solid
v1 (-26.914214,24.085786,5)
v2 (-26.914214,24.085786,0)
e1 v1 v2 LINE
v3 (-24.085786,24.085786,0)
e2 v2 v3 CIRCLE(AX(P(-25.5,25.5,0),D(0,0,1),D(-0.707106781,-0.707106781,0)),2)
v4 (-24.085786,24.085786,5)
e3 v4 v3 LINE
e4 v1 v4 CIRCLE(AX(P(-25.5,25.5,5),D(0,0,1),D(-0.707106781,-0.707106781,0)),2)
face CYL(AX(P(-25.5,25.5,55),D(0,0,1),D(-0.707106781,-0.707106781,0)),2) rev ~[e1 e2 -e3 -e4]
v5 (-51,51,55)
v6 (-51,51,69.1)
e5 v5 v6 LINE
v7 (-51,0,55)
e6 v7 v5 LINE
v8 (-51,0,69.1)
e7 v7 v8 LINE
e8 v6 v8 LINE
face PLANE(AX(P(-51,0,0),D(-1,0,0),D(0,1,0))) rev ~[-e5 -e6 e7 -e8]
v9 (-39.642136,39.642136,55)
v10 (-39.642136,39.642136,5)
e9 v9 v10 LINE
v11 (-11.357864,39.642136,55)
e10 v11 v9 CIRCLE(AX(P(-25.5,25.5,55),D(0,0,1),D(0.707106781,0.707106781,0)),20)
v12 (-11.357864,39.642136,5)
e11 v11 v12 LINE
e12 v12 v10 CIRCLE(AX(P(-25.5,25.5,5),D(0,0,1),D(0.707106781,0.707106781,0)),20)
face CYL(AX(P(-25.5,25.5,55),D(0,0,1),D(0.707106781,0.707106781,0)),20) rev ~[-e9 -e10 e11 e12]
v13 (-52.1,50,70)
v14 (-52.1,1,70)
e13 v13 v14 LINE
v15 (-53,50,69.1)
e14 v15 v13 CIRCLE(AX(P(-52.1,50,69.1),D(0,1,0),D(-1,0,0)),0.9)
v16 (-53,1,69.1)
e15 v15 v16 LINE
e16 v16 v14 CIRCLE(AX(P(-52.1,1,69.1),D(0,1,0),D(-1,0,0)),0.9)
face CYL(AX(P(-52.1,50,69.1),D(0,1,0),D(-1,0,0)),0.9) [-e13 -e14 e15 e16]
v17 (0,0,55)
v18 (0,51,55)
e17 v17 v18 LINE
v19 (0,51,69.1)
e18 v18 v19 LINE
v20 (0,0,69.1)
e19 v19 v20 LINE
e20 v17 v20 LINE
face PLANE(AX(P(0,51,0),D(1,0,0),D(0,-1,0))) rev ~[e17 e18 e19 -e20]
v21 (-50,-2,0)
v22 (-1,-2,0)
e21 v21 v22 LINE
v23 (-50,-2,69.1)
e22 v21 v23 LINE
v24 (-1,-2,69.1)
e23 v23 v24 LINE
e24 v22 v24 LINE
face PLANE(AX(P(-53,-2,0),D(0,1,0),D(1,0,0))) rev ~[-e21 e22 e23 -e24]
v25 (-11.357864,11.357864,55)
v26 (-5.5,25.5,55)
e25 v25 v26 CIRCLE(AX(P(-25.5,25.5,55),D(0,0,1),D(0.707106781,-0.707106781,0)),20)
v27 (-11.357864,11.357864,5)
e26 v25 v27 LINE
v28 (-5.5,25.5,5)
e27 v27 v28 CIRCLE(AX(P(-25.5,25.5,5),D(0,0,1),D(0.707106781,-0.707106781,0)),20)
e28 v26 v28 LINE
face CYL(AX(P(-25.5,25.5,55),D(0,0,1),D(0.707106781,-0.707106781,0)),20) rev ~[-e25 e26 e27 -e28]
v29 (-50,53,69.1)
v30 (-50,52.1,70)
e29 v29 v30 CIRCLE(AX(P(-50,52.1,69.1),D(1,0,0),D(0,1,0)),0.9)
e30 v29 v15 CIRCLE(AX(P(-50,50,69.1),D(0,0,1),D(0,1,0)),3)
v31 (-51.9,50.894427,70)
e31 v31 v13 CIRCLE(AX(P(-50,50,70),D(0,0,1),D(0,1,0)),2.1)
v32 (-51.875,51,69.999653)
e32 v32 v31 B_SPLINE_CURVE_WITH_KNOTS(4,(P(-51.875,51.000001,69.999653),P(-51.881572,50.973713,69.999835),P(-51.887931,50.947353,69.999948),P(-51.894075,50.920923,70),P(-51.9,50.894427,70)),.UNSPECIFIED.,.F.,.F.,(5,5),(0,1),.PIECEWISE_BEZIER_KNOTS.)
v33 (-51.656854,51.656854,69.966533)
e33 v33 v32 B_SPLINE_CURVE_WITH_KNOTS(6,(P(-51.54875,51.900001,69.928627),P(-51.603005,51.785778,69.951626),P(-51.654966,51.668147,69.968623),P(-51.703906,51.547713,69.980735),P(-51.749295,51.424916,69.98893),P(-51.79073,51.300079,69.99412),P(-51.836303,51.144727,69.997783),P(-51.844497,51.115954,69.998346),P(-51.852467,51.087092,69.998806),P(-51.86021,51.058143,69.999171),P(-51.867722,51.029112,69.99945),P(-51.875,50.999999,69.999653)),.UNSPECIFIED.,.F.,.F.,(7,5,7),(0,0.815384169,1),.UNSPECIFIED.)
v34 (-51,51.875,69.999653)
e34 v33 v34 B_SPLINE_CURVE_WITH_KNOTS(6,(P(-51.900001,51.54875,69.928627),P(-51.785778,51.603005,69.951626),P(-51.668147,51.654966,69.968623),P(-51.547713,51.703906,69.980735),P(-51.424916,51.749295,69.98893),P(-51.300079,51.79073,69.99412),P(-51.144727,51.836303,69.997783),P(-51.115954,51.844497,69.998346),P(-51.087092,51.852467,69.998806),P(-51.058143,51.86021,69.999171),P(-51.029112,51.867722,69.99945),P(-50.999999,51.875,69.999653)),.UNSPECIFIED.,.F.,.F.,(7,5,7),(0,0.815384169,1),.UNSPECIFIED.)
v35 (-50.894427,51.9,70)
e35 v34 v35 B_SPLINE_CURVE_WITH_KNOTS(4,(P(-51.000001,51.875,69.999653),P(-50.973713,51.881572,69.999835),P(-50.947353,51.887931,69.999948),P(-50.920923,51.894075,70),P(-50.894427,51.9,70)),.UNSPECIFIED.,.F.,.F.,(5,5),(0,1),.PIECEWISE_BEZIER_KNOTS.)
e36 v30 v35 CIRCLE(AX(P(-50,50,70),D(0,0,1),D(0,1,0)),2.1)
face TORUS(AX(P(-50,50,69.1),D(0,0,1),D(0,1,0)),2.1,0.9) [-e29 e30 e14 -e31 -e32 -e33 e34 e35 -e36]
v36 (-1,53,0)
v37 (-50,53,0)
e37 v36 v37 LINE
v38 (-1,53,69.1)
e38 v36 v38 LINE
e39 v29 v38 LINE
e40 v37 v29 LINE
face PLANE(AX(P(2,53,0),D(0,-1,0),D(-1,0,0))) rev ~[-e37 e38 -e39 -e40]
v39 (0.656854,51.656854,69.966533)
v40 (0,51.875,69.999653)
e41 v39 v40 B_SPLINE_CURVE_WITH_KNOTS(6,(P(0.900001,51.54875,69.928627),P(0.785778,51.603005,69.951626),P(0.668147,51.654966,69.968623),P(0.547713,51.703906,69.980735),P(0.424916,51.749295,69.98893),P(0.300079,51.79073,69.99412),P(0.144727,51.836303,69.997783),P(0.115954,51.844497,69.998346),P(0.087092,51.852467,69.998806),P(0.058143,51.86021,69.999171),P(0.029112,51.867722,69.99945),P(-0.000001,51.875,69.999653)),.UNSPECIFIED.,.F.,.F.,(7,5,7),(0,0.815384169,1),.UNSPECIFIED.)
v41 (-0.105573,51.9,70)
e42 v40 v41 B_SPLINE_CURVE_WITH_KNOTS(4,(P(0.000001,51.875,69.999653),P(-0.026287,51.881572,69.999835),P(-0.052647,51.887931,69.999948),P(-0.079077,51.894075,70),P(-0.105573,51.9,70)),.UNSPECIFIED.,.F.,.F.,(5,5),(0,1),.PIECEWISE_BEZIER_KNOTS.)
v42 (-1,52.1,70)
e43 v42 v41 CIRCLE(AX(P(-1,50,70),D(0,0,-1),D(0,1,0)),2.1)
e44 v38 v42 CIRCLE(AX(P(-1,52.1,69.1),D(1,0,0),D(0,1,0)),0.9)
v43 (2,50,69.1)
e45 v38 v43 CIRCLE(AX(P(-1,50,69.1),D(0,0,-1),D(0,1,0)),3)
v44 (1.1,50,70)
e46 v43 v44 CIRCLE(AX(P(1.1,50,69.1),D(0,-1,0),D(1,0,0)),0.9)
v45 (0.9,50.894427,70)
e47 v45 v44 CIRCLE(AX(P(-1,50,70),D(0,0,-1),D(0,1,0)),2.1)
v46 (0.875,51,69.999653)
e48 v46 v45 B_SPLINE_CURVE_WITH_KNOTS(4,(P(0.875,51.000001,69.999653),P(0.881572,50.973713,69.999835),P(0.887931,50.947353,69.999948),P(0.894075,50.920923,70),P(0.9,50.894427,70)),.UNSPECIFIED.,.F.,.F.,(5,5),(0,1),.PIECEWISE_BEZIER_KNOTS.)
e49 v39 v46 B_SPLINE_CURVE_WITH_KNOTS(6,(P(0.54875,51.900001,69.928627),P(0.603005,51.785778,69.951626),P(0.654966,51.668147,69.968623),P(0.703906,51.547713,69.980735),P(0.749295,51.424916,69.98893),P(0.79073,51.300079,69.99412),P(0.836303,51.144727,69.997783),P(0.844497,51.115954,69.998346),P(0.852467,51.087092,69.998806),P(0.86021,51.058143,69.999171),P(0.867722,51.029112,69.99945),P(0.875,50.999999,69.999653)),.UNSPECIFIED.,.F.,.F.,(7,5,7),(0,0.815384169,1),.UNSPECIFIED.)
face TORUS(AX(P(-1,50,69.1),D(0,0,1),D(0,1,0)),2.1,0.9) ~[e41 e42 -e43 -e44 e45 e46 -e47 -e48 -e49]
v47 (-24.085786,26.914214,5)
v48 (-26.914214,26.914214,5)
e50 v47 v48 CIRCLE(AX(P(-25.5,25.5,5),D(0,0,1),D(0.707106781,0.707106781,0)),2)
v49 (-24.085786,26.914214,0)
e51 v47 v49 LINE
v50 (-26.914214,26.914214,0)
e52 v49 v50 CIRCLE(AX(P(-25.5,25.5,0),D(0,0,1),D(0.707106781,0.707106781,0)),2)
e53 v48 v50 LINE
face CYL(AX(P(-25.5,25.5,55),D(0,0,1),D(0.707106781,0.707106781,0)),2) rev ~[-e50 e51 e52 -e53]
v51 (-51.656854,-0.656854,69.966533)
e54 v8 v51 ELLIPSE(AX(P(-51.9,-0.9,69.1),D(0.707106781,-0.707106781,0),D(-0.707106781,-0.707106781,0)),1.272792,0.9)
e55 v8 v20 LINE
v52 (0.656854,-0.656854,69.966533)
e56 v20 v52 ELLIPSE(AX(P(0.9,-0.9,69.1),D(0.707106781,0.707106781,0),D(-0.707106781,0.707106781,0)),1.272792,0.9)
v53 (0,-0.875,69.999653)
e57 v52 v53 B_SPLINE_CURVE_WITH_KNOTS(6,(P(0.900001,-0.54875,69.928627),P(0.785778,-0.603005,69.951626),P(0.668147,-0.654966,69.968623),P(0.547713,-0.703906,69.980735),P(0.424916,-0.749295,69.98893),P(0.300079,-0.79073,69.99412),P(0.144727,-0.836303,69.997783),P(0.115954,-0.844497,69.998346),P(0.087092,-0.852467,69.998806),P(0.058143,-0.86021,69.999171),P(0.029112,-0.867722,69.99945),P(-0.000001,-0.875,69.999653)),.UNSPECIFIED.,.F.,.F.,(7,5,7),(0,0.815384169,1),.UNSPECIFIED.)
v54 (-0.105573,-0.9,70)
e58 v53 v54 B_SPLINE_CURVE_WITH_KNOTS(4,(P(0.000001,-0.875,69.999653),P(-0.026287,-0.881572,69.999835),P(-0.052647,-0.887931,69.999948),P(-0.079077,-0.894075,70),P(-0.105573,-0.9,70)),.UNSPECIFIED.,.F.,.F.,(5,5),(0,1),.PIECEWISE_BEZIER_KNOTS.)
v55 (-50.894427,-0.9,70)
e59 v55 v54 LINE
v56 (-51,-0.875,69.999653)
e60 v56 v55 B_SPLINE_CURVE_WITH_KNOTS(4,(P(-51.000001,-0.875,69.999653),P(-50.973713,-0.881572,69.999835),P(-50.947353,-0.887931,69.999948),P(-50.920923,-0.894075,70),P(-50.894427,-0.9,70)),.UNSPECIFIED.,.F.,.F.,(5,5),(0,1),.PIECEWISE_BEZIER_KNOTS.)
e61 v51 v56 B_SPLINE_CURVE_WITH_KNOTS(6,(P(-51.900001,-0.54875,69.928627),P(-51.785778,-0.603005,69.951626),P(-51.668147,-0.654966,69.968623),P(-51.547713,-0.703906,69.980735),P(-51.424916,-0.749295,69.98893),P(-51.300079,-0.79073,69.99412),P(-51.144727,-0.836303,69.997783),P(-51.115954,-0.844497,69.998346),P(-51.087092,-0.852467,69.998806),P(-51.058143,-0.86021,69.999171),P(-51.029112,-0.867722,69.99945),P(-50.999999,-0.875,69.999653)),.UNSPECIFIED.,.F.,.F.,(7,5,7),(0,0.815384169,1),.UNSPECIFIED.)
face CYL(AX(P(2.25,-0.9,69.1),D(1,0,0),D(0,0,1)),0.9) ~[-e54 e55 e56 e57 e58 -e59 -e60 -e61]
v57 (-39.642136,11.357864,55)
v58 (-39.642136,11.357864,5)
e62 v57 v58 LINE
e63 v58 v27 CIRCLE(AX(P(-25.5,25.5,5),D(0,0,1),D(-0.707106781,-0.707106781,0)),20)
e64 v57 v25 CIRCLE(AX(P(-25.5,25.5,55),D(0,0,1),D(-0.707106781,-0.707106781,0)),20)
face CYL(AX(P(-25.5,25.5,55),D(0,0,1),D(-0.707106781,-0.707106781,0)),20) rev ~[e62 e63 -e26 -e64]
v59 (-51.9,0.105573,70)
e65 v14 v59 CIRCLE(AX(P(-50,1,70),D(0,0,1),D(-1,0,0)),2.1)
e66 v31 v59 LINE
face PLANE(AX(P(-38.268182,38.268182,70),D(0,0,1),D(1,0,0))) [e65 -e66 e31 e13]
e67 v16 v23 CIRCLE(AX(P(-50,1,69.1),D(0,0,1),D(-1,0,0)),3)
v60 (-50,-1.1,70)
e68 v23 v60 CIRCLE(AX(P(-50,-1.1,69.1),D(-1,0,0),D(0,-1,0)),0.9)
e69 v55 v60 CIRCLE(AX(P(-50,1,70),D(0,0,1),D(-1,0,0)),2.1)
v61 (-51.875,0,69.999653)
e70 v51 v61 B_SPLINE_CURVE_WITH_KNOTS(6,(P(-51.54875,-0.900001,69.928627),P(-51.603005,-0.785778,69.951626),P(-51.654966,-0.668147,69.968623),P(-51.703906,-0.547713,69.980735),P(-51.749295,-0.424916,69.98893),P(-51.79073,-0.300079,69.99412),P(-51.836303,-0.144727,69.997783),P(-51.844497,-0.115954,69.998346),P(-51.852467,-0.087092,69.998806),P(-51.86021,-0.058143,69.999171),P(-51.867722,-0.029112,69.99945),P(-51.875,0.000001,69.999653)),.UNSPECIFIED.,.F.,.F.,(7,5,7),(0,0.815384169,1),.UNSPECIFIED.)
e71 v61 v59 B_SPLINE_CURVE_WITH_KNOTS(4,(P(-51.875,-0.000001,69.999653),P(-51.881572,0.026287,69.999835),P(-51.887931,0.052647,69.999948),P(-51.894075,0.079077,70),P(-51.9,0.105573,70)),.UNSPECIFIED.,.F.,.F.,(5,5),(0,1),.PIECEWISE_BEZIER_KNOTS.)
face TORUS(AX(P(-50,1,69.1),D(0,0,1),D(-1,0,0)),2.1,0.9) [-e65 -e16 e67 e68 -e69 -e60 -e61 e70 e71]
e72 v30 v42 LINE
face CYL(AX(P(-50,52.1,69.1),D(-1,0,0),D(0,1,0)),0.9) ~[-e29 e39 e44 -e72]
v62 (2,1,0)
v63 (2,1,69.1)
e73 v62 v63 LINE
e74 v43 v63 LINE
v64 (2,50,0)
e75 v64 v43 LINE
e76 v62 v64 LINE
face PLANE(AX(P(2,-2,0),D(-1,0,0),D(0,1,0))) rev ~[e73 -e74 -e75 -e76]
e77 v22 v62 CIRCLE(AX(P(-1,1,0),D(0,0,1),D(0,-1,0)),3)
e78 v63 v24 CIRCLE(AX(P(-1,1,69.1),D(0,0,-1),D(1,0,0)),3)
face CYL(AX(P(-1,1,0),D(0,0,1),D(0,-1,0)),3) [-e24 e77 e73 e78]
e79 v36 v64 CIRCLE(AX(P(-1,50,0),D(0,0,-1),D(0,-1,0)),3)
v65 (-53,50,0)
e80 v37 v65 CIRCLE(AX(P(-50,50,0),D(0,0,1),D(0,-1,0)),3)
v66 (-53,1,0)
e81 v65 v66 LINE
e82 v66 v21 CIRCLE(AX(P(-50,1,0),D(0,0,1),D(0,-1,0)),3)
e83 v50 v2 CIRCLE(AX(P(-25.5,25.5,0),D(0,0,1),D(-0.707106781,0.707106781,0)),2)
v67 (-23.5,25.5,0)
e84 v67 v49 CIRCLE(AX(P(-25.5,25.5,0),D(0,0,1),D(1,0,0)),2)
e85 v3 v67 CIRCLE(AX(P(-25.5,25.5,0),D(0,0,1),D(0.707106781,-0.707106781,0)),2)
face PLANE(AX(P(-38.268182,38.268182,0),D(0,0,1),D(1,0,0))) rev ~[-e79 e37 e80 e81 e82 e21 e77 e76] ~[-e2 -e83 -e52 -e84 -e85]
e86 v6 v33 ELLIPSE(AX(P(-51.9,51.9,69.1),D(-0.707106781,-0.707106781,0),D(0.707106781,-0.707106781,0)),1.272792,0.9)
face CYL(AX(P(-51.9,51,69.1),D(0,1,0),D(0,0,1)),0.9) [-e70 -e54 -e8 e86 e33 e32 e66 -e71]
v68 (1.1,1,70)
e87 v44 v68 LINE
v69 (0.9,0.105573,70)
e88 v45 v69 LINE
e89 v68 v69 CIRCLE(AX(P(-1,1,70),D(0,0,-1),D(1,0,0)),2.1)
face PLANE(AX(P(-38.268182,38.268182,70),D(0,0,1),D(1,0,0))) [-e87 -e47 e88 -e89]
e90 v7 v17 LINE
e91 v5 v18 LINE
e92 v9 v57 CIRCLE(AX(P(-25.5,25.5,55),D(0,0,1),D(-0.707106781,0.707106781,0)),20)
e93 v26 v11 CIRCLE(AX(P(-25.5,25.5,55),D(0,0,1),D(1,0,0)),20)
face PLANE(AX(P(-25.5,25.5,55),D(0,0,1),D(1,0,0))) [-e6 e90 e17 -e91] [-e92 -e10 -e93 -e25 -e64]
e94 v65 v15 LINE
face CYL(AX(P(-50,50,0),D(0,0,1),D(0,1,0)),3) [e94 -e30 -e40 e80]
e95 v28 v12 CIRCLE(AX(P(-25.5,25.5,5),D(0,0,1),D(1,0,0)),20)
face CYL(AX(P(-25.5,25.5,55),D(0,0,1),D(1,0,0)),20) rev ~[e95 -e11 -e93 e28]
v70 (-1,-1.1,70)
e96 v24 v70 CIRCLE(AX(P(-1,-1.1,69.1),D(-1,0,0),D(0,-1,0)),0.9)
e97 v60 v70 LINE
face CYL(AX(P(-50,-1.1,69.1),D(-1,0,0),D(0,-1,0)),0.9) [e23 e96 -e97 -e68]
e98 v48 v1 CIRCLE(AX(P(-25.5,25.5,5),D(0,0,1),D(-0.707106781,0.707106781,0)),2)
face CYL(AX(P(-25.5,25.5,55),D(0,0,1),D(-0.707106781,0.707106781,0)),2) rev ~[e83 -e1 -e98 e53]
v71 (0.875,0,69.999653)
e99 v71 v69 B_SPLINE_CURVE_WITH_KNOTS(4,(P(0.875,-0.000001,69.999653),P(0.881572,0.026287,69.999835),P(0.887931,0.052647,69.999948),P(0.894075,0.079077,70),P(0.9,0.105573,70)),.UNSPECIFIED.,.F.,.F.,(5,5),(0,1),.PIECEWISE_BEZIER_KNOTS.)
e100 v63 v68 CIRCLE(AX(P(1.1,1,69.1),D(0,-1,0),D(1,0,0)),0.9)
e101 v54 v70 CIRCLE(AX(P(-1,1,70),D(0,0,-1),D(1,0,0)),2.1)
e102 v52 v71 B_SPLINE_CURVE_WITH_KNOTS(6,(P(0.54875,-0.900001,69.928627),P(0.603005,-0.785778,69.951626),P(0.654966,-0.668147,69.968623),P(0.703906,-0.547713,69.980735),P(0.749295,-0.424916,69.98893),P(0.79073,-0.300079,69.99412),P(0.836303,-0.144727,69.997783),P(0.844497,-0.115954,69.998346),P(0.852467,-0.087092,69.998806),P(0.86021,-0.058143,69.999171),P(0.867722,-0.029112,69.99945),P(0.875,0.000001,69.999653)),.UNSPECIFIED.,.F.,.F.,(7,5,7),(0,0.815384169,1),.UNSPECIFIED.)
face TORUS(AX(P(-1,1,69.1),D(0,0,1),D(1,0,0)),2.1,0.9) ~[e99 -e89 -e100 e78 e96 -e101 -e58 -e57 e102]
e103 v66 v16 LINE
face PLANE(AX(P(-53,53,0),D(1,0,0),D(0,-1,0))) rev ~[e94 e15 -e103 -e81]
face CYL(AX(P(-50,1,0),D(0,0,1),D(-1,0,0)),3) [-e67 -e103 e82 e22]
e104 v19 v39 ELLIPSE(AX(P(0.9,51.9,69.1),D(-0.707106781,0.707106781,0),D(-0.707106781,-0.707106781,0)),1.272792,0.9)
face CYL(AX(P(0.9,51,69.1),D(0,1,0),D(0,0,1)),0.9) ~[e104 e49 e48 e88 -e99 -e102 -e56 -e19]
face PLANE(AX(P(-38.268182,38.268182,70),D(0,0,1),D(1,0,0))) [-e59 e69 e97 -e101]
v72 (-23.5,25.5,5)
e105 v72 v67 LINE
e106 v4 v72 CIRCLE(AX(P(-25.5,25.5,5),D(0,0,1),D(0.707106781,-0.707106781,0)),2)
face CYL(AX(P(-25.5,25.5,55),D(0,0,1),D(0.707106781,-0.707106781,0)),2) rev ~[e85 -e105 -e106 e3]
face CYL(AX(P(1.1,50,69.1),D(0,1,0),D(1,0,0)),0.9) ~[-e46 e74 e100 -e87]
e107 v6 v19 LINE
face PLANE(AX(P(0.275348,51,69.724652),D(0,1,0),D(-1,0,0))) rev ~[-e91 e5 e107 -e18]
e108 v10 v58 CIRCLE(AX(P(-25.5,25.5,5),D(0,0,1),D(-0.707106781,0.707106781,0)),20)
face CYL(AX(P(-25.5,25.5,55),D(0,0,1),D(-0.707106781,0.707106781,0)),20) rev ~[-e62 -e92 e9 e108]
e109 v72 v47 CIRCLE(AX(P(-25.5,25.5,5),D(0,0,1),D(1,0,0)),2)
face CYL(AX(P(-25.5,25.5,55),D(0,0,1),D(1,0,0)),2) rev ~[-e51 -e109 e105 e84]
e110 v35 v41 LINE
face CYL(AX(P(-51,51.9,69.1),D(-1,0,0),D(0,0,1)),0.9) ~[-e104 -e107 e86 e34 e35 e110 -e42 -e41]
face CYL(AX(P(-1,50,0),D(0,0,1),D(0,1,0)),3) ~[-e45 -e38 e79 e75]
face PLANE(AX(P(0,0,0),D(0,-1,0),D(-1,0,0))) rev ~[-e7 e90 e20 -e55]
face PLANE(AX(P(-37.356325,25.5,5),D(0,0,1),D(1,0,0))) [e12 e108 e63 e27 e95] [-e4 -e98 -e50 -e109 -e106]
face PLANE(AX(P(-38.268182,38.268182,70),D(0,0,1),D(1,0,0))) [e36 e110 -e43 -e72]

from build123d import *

# Parameters (mm, degrees)
F0_W         = 51
F0_H         = 51
F1_DEPTH     = 55
F2_DEPTH     = 70
F4_DEPTH     = 50
F5_DEPTH     = 100
F6_R         = 3
F7_T1_DEPTH  = 51
F7_T3_DEPTH  = 51
F7_T5_DEPTH  = 49
F7_T7_DEPTH  = 49
F7_T10_ANGLE = 90
F7_T12_ANGLE = 90
F7_T14_ANGLE = 90
F7_T16_ANGLE = 90
F7_T21_DEPTH = 53.25
F7_T25_DEPTH = 53.25
F7_T32_DEPTH = 53.25
F7_T36_DEPTH = 53.25
F7_T43_DEPTH = 53.25
F7_T47_DEPTH = 53.25
F7_T54_DEPTH = 53.25
F7_T58_DEPTH = 53.25


# Not quite as in the source:
# - a fillet or chamfer that OpenCascade refuses, or shapes differently, is made with other operations: its cross-section is extruded or revolved along the edge and cut away or added


with BuildPart() as f1:
    # F0 (on Top) → F1 (new body)
    with BuildSketch(Plane.XY):
        with Locations((-25.5, 25.5)):
            Rectangle(F0_W, F0_H)
    extrude(amount=F1_DEPTH)

    # F0 (on Top) → F2 (join)
    with BuildSketch(Plane.XY):
        Polygon((-51, -2), (-51, 0), (-51, 51), (0, 51), (2, 51), (2, 53), (-53, 53), (-53, -2), align=None)
        Polygon((0, 51), (0, 0), (-51, 0), (-51, -2), (0, -2), (2, -2), (2, 51), align=None)
    extrude(amount=F2_DEPTH)

    # F3 (on face) → F4 (cut)
    with BuildSketch(Plane.XY.offset(55)):
        with BuildLine():
            Line((-26.9142135624, 26.9142135624), (-39.6421356237, 39.6421356237))
            ThreePointArc((-39.6421356237, 39.6421356237), (-45.5, 25.5), (-39.6421356237, 11.3578643763))
            Line((-39.6421356237, 11.3578643763), (-26.9142135624, 24.0857864376))
            ThreePointArc((-26.9142135624, 24.0857864376), (-27.5, 25.5), (-26.9142135624, 26.9142135624))
        make_face()
        with BuildLine():
            Line((-24.0857864376, 26.9142135624), (-25.5, 25.5))
            Line((-25.5, 25.5), (-24.0857864376, 24.0857864376))
            ThreePointArc((-24.0857864376, 24.0857864376), (-23.652240935, 24.7346331353), (-23.5, 25.5))
            ThreePointArc((-23.5, 25.5), (-23.652240935, 26.2653668647), (-24.0857864376, 26.9142135624))
        make_face()
        with BuildLine():
            Line((-24.0857864376, 24.0857864376), (-25.5, 25.5))
            Line((-25.5, 25.5), (-26.9142135624, 24.0857864376))
            ThreePointArc((-26.9142135624, 24.0857864376), (-25.5, 23.5), (-24.0857864376, 24.0857864376))
        make_face()
        with BuildLine():
            ThreePointArc((-11.3578643763, 39.6421356237), (-25.5, 45.5), (-39.6421356237, 39.6421356237))
            Line((-39.6421356237, 39.6421356237), (-26.9142135624, 26.9142135624))
            ThreePointArc((-26.9142135624, 26.9142135624), (-25.5, 27.5), (-24.0857864376, 26.9142135624))
            Line((-24.0857864376, 26.9142135624), (-11.3578643763, 39.6421356237))
        make_face()
        with BuildLine():
            Line((-25.5, 25.5), (-26.9142135624, 26.9142135624))
            ThreePointArc((-26.9142135624, 26.9142135624), (-27.5, 25.5), (-26.9142135624, 24.0857864376))
            Line((-26.9142135624, 24.0857864376), (-25.5, 25.5))
        make_face()
        with BuildLine():
            ThreePointArc((-5.5, 25.5), (-7.0224093498, 33.1536686473), (-11.3578643763, 39.6421356237))
            Line((-11.3578643763, 39.6421356237), (-24.0857864376, 26.9142135624))
            ThreePointArc((-24.0857864376, 26.9142135624), (-23.652240935, 26.2653668647), (-23.5, 25.5))
            ThreePointArc((-23.5, 25.5), (-23.652240935, 24.7346331353), (-24.0857864376, 24.0857864376))
            Line((-24.0857864376, 24.0857864376), (-11.3578643763, 11.3578643763))
            ThreePointArc((-11.3578643763, 11.3578643763), (-7.0224093498, 17.8463313527), (-5.5, 25.5))
        make_face()
        with BuildLine():
            Line((-26.9142135624, 24.0857864376), (-39.6421356237, 11.3578643763))
            ThreePointArc((-39.6421356237, 11.3578643763), (-25.5, 5.5), (-11.3578643763, 11.3578643763))
            Line((-11.3578643763, 11.3578643763), (-24.0857864376, 24.0857864376))
            ThreePointArc((-24.0857864376, 24.0857864376), (-25.5, 23.5), (-26.9142135624, 24.0857864376))
        make_face()
        with BuildLine():
            ThreePointArc((-24.0857864376, 26.9142135624), (-25.5, 27.5), (-26.9142135624, 26.9142135624))
            Line((-26.9142135624, 26.9142135624), (-25.5, 25.5))
            Line((-25.5, 25.5), (-24.0857864376, 26.9142135624))
        make_face()
    extrude(amount=-F4_DEPTH, mode=Mode.SUBTRACT)

    # F3 (on face) → F5 (cut)
    with BuildSketch(Plane.XY.offset(55)):
        with BuildLine():
            ThreePointArc((-24.0857864376, 26.9142135624), (-25.5, 27.5), (-26.9142135624, 26.9142135624))
            Line((-26.9142135624, 26.9142135624), (-25.5, 25.5))
            Line((-25.5, 25.5), (-24.0857864376, 26.9142135624))
        make_face()
        with BuildLine():
            Line((-24.0857864376, 26.9142135624), (-25.5, 25.5))
            Line((-25.5, 25.5), (-24.0857864376, 24.0857864376))
            ThreePointArc((-24.0857864376, 24.0857864376), (-23.652240935, 24.7346331353), (-23.5, 25.5))
            ThreePointArc((-23.5, 25.5), (-23.652240935, 26.2653668647), (-24.0857864376, 26.9142135624))
        make_face()
        with BuildLine():
            Line((-24.0857864376, 24.0857864376), (-25.5, 25.5))
            Line((-25.5, 25.5), (-26.9142135624, 24.0857864376))
            ThreePointArc((-26.9142135624, 24.0857864376), (-25.5, 23.5), (-24.0857864376, 24.0857864376))
        make_face()
        with BuildLine():
            Line((-25.5, 25.5), (-26.9142135624, 26.9142135624))
            ThreePointArc((-26.9142135624, 26.9142135624), (-27.5, 25.5), (-26.9142135624, 24.0857864376))
            Line((-26.9142135624, 24.0857864376), (-25.5, 25.5))
        make_face()
    extrude(amount=-F5_DEPTH, mode=Mode.SUBTRACT)

    # F6
    f6_edges = [f1.edges().sort_by_distance(p)[0] for p in [
        (2, 53, 35),
        (-53, 53, 35),
        (-53, -2, 35),
        (2, -2, 35),
    ]]
    fillet(f6_edges, radius=F6_R)

    # F7: fillet of radius 0.9 on 5 edges, made by hand

    # F7_s2 → F7_t1 (cut)
    with BuildSketch(Plane.XZ.offset(-51)):
        with BuildLine():
            ThreePointArc((0.9, 70), (0.2636038969, 69.7363961031), (0, 69.1))
            Line((0, 69.1), (0, 70))
            Line((0, 70), (0.9, 70))
        make_face()
        with BuildLine():
            ThreePointArc((-51.9, 70), (-51.2636038969, 69.7363961031), (-51, 69.1))
            Line((-51, 69.1), (-51, 70))
            Line((-51, 70), (-51.9, 70))
        make_face()
    extrude(amount=F7_T1_DEPTH, mode=Mode.SUBTRACT)

    # F7_s4 → F7_t3 (cut)
    with BuildSketch(Plane.YZ.offset(-51)):
        with BuildLine():
            ThreePointArc((51.9, 70), (51.2636038969, 69.7363961031), (51, 69.1))
            Line((51, 69.1), (51, 70))
            Line((51, 70), (51.9, 70))
        make_face()
        with BuildLine():
            ThreePointArc((-0.9, 70), (-0.2636038969, 69.7363961031), (0, 69.1))
            Line((0, 69.1), (0, 70))
            Line((0, 70), (-0.9, 70))
        make_face()
    extrude(amount=F7_T3_DEPTH, mode=Mode.SUBTRACT)

    # F7_s6 → F7_t5 (cut)
    with BuildSketch(Plane.YZ.offset(-50)):
        with BuildLine():
            ThreePointArc((-2, 69.1), (-1.7363961031, 69.7363961031), (-1.1, 70))
            Line((-1.1, 70), (-2, 70))
            Line((-2, 70), (-2, 69.1))
        make_face()
        with BuildLine():
            ThreePointArc((53, 69.1), (52.7363961031, 69.7363961031), (52.1, 70))
            Line((52.1, 70), (53, 70))
            Line((53, 70), (53, 69.1))
        make_face()
    extrude(amount=F7_T5_DEPTH, mode=Mode.SUBTRACT)

    # F7_s8 → F7_t7 (cut)
    with BuildSketch(Plane.XZ.offset(-50)):
        with BuildLine():
            ThreePointArc((2, 69.1), (1.7363961031, 69.7363961031), (1.1, 70))
            Line((1.1, 70), (2, 70))
            Line((2, 70), (2, 69.1))
        make_face()
        with BuildLine():
            ThreePointArc((-53, 69.1), (-52.7363961031, 69.7363961031), (-52.1, 70))
            Line((-52.1, 70), (-53, 70))
            Line((-53, 70), (-53, 69.1))
        make_face()
    extrude(amount=F7_T7_DEPTH, mode=Mode.SUBTRACT)

    # F7_s9 → F7_t10 (revolve, cut)
    with BuildSketch(Plane.XZ.offset(-1)):
        with BuildLine():
            ThreePointArc((-53, 69.1), (-52.7363961031, 69.7363961031), (-52.1, 70))
            Line((-52.1, 70), (-53, 70))
            Line((-53, 70), (-53, 69.1))
        make_face()
    revolve(axis=Axis((-50, 1, 70), (0, 0, 1)), revolution_arc=F7_T10_ANGLE, mode=Mode.SUBTRACT)

    # F7_s11 → F7_t12 (revolve, cut)
    with BuildSketch(Plane.XZ.offset(-1)):
        with BuildLine():
            ThreePointArc((2, 69.1), (1.7363961031, 69.7363961031), (1.1, 70))
            Line((1.1, 70), (2, 70))
            Line((2, 70), (2, 69.1))
        make_face()
    revolve(axis=Axis((-1, 1, 70), (0, 0, -1)), revolution_arc=F7_T12_ANGLE, mode=Mode.SUBTRACT)

    # F7_s13 → F7_t14 (revolve, cut)
    with BuildSketch(Plane.YZ.offset(-1)):
        with BuildLine():
            ThreePointArc((53, 69.1), (52.7363961031, 69.7363961031), (52.1, 70))
            Line((52.1, 70), (53, 70))
            Line((53, 70), (53, 69.1))
        make_face()
    revolve(axis=Axis((-1, 50, 70), (0, 0, -1)), revolution_arc=F7_T14_ANGLE, mode=Mode.SUBTRACT)

    # F7_s15 → F7_t16 (revolve, cut)
    with BuildSketch(Plane.YZ.offset(-50)):
        with BuildLine():
            ThreePointArc((53, 69.1), (52.7363961031, 69.7363961031), (52.1, 70))
            Line((52.1, 70), (53, 70))
            Line((53, 70), (53, 69.1))
        make_face()
    revolve(axis=Axis((-50, 50, 70), (0, 0, 1)), revolution_arc=F7_T16_ANGLE, mode=Mode.SUBTRACT)


with BuildPart() as f7_tool19:
    # F7_s20 → F7_t21 (new body)
    with BuildSketch(Plane.YZ.offset(-51)):
        with BuildLine():
            ThreePointArc((51.9, 70), (51.2636038969, 69.7363961031), (51, 69.1))
            Line((51, 69.1), (51, 70))
            Line((51, 70), (51.9, 70))
        make_face()
    extrude(amount=F7_T21_DEPTH)

    split(bisect_by=Plane.YZ, keep=Keep.TOP)


with BuildPart() as f7_tool23:
    # F7_s24 → F7_t25 (new body)
    with BuildSketch(Plane.XZ.offset(-53.25)):
        with BuildLine():
            ThreePointArc((0.9, 70), (0.2636038969, 69.7363961031), (0, 69.1))
            Line((0, 69.1), (0, 70))
            Line((0, 70), (0.9, 70))
        make_face()
    extrude(amount=F7_T25_DEPTH)

    split(bisect_by=Plane.XZ.offset(-51), keep=Keep.BOTTOM)


with BuildPart() as f7_tool19_1:
    add(f7_tool19.part)

    # F7_t27: intersect F7_tool23
    add(f7_tool23.part, mode=Mode.INTERSECT)


with BuildPart() as f1_1:
    add(f1.part)

    # F7_t17: cut F7_tool19
    add(f7_tool19_1.part, mode=Mode.SUBTRACT)


with BuildPart() as f7_tool30:
    # F7_s31 → F7_t32 (new body)
    with BuildSketch(Plane.XZ.offset(-51)):
        with BuildLine():
            ThreePointArc((0.9, 70), (0.2636038969, 69.7363961031), (0, 69.1))
            Line((0, 69.1), (0, 70))
            Line((0, 70), (0.9, 70))
        make_face()
    extrude(amount=F7_T32_DEPTH)

    split(bisect_by=Plane.XZ, keep=Keep.TOP)


with BuildPart() as f7_tool34:
    # F7_s35 → F7_t36 (new body)
    with BuildSketch(Plane.YZ.offset(2.25)):
        with BuildLine():
            ThreePointArc((-0.9, 70), (-0.2636038969, 69.7363961031), (0, 69.1))
            Line((0, 69.1), (0, 70))
            Line((0, 70), (-0.9, 70))
        make_face()
    extrude(amount=-F7_T36_DEPTH)

    split(bisect_by=Plane.YZ, keep=Keep.TOP)


with BuildPart() as f7_tool30_1:
    add(f7_tool30.part)

    # F7_t38: intersect F7_tool34
    add(f7_tool34.part, mode=Mode.INTERSECT)


with BuildPart() as f1_2:
    add(f1_1.part)

    # F7_t28: cut F7_tool30
    add(f7_tool30_1.part, mode=Mode.SUBTRACT)


with BuildPart() as f7_tool41:
    # F7_s42 → F7_t43 (new body)
    with BuildSketch(Plane.XZ):
        with BuildLine():
            ThreePointArc((-51.9, 70), (-51.2636038969, 69.7363961031), (-51, 69.1))
            Line((-51, 69.1), (-51, 70))
            Line((-51, 70), (-51.9, 70))
        make_face()
    extrude(amount=-F7_T43_DEPTH)

    split(bisect_by=Plane.XZ.offset(-51), keep=Keep.BOTTOM)


with BuildPart() as f7_tool45:
    # F7_s46 → F7_t47 (new body)
    with BuildSketch(Plane.YZ.offset(-53.25)):
        with BuildLine():
            ThreePointArc((51.9, 70), (51.2636038969, 69.7363961031), (51, 69.1))
            Line((51, 69.1), (51, 70))
            Line((51, 70), (51.9, 70))
        make_face()
    extrude(amount=F7_T47_DEPTH)

    split(bisect_by=Plane.YZ.offset(-51), keep=Keep.BOTTOM)


with BuildPart() as f7_tool41_1:
    add(f7_tool41.part)

    # F7_t49: intersect F7_tool45
    add(f7_tool45.part, mode=Mode.INTERSECT)


with BuildPart() as f1_3:
    add(f1_2.part)

    # F7_t39: cut F7_tool41
    add(f7_tool41_1.part, mode=Mode.SUBTRACT)


with BuildPart() as f7_tool52:
    # F7_s53 → F7_t54 (new body)
    with BuildSketch(Plane.XZ.offset(2.25)):
        with BuildLine():
            ThreePointArc((-51.9, 70), (-51.2636038969, 69.7363961031), (-51, 69.1))
            Line((-51, 69.1), (-51, 70))
            Line((-51, 70), (-51.9, 70))
        make_face()
    extrude(amount=-F7_T54_DEPTH)

    split(bisect_by=Plane.XZ, keep=Keep.TOP)


with BuildPart() as f7_tool56:
    # F7_s57 → F7_t58 (new body)
    with BuildSketch(Plane.YZ):
        with BuildLine():
            ThreePointArc((-0.9, 70), (-0.2636038969, 69.7363961031), (0, 69.1))
            Line((0, 69.1), (0, 70))
            Line((0, 70), (-0.9, 70))
        make_face()
    extrude(amount=-F7_T58_DEPTH)

    split(bisect_by=Plane.YZ.offset(-51), keep=Keep.BOTTOM)


with BuildPart() as f7_tool52_1:
    add(f7_tool52.part)

    # F7_t60: intersect F7_tool56
    add(f7_tool56.part, mode=Mode.INTERSECT)


with BuildPart() as f1_4:
    add(f1_3.part)

    # F7_t50: cut F7_tool52
    add(f7_tool52_1.part, mode=Mode.SUBTRACT)


solid = f1_4.part
